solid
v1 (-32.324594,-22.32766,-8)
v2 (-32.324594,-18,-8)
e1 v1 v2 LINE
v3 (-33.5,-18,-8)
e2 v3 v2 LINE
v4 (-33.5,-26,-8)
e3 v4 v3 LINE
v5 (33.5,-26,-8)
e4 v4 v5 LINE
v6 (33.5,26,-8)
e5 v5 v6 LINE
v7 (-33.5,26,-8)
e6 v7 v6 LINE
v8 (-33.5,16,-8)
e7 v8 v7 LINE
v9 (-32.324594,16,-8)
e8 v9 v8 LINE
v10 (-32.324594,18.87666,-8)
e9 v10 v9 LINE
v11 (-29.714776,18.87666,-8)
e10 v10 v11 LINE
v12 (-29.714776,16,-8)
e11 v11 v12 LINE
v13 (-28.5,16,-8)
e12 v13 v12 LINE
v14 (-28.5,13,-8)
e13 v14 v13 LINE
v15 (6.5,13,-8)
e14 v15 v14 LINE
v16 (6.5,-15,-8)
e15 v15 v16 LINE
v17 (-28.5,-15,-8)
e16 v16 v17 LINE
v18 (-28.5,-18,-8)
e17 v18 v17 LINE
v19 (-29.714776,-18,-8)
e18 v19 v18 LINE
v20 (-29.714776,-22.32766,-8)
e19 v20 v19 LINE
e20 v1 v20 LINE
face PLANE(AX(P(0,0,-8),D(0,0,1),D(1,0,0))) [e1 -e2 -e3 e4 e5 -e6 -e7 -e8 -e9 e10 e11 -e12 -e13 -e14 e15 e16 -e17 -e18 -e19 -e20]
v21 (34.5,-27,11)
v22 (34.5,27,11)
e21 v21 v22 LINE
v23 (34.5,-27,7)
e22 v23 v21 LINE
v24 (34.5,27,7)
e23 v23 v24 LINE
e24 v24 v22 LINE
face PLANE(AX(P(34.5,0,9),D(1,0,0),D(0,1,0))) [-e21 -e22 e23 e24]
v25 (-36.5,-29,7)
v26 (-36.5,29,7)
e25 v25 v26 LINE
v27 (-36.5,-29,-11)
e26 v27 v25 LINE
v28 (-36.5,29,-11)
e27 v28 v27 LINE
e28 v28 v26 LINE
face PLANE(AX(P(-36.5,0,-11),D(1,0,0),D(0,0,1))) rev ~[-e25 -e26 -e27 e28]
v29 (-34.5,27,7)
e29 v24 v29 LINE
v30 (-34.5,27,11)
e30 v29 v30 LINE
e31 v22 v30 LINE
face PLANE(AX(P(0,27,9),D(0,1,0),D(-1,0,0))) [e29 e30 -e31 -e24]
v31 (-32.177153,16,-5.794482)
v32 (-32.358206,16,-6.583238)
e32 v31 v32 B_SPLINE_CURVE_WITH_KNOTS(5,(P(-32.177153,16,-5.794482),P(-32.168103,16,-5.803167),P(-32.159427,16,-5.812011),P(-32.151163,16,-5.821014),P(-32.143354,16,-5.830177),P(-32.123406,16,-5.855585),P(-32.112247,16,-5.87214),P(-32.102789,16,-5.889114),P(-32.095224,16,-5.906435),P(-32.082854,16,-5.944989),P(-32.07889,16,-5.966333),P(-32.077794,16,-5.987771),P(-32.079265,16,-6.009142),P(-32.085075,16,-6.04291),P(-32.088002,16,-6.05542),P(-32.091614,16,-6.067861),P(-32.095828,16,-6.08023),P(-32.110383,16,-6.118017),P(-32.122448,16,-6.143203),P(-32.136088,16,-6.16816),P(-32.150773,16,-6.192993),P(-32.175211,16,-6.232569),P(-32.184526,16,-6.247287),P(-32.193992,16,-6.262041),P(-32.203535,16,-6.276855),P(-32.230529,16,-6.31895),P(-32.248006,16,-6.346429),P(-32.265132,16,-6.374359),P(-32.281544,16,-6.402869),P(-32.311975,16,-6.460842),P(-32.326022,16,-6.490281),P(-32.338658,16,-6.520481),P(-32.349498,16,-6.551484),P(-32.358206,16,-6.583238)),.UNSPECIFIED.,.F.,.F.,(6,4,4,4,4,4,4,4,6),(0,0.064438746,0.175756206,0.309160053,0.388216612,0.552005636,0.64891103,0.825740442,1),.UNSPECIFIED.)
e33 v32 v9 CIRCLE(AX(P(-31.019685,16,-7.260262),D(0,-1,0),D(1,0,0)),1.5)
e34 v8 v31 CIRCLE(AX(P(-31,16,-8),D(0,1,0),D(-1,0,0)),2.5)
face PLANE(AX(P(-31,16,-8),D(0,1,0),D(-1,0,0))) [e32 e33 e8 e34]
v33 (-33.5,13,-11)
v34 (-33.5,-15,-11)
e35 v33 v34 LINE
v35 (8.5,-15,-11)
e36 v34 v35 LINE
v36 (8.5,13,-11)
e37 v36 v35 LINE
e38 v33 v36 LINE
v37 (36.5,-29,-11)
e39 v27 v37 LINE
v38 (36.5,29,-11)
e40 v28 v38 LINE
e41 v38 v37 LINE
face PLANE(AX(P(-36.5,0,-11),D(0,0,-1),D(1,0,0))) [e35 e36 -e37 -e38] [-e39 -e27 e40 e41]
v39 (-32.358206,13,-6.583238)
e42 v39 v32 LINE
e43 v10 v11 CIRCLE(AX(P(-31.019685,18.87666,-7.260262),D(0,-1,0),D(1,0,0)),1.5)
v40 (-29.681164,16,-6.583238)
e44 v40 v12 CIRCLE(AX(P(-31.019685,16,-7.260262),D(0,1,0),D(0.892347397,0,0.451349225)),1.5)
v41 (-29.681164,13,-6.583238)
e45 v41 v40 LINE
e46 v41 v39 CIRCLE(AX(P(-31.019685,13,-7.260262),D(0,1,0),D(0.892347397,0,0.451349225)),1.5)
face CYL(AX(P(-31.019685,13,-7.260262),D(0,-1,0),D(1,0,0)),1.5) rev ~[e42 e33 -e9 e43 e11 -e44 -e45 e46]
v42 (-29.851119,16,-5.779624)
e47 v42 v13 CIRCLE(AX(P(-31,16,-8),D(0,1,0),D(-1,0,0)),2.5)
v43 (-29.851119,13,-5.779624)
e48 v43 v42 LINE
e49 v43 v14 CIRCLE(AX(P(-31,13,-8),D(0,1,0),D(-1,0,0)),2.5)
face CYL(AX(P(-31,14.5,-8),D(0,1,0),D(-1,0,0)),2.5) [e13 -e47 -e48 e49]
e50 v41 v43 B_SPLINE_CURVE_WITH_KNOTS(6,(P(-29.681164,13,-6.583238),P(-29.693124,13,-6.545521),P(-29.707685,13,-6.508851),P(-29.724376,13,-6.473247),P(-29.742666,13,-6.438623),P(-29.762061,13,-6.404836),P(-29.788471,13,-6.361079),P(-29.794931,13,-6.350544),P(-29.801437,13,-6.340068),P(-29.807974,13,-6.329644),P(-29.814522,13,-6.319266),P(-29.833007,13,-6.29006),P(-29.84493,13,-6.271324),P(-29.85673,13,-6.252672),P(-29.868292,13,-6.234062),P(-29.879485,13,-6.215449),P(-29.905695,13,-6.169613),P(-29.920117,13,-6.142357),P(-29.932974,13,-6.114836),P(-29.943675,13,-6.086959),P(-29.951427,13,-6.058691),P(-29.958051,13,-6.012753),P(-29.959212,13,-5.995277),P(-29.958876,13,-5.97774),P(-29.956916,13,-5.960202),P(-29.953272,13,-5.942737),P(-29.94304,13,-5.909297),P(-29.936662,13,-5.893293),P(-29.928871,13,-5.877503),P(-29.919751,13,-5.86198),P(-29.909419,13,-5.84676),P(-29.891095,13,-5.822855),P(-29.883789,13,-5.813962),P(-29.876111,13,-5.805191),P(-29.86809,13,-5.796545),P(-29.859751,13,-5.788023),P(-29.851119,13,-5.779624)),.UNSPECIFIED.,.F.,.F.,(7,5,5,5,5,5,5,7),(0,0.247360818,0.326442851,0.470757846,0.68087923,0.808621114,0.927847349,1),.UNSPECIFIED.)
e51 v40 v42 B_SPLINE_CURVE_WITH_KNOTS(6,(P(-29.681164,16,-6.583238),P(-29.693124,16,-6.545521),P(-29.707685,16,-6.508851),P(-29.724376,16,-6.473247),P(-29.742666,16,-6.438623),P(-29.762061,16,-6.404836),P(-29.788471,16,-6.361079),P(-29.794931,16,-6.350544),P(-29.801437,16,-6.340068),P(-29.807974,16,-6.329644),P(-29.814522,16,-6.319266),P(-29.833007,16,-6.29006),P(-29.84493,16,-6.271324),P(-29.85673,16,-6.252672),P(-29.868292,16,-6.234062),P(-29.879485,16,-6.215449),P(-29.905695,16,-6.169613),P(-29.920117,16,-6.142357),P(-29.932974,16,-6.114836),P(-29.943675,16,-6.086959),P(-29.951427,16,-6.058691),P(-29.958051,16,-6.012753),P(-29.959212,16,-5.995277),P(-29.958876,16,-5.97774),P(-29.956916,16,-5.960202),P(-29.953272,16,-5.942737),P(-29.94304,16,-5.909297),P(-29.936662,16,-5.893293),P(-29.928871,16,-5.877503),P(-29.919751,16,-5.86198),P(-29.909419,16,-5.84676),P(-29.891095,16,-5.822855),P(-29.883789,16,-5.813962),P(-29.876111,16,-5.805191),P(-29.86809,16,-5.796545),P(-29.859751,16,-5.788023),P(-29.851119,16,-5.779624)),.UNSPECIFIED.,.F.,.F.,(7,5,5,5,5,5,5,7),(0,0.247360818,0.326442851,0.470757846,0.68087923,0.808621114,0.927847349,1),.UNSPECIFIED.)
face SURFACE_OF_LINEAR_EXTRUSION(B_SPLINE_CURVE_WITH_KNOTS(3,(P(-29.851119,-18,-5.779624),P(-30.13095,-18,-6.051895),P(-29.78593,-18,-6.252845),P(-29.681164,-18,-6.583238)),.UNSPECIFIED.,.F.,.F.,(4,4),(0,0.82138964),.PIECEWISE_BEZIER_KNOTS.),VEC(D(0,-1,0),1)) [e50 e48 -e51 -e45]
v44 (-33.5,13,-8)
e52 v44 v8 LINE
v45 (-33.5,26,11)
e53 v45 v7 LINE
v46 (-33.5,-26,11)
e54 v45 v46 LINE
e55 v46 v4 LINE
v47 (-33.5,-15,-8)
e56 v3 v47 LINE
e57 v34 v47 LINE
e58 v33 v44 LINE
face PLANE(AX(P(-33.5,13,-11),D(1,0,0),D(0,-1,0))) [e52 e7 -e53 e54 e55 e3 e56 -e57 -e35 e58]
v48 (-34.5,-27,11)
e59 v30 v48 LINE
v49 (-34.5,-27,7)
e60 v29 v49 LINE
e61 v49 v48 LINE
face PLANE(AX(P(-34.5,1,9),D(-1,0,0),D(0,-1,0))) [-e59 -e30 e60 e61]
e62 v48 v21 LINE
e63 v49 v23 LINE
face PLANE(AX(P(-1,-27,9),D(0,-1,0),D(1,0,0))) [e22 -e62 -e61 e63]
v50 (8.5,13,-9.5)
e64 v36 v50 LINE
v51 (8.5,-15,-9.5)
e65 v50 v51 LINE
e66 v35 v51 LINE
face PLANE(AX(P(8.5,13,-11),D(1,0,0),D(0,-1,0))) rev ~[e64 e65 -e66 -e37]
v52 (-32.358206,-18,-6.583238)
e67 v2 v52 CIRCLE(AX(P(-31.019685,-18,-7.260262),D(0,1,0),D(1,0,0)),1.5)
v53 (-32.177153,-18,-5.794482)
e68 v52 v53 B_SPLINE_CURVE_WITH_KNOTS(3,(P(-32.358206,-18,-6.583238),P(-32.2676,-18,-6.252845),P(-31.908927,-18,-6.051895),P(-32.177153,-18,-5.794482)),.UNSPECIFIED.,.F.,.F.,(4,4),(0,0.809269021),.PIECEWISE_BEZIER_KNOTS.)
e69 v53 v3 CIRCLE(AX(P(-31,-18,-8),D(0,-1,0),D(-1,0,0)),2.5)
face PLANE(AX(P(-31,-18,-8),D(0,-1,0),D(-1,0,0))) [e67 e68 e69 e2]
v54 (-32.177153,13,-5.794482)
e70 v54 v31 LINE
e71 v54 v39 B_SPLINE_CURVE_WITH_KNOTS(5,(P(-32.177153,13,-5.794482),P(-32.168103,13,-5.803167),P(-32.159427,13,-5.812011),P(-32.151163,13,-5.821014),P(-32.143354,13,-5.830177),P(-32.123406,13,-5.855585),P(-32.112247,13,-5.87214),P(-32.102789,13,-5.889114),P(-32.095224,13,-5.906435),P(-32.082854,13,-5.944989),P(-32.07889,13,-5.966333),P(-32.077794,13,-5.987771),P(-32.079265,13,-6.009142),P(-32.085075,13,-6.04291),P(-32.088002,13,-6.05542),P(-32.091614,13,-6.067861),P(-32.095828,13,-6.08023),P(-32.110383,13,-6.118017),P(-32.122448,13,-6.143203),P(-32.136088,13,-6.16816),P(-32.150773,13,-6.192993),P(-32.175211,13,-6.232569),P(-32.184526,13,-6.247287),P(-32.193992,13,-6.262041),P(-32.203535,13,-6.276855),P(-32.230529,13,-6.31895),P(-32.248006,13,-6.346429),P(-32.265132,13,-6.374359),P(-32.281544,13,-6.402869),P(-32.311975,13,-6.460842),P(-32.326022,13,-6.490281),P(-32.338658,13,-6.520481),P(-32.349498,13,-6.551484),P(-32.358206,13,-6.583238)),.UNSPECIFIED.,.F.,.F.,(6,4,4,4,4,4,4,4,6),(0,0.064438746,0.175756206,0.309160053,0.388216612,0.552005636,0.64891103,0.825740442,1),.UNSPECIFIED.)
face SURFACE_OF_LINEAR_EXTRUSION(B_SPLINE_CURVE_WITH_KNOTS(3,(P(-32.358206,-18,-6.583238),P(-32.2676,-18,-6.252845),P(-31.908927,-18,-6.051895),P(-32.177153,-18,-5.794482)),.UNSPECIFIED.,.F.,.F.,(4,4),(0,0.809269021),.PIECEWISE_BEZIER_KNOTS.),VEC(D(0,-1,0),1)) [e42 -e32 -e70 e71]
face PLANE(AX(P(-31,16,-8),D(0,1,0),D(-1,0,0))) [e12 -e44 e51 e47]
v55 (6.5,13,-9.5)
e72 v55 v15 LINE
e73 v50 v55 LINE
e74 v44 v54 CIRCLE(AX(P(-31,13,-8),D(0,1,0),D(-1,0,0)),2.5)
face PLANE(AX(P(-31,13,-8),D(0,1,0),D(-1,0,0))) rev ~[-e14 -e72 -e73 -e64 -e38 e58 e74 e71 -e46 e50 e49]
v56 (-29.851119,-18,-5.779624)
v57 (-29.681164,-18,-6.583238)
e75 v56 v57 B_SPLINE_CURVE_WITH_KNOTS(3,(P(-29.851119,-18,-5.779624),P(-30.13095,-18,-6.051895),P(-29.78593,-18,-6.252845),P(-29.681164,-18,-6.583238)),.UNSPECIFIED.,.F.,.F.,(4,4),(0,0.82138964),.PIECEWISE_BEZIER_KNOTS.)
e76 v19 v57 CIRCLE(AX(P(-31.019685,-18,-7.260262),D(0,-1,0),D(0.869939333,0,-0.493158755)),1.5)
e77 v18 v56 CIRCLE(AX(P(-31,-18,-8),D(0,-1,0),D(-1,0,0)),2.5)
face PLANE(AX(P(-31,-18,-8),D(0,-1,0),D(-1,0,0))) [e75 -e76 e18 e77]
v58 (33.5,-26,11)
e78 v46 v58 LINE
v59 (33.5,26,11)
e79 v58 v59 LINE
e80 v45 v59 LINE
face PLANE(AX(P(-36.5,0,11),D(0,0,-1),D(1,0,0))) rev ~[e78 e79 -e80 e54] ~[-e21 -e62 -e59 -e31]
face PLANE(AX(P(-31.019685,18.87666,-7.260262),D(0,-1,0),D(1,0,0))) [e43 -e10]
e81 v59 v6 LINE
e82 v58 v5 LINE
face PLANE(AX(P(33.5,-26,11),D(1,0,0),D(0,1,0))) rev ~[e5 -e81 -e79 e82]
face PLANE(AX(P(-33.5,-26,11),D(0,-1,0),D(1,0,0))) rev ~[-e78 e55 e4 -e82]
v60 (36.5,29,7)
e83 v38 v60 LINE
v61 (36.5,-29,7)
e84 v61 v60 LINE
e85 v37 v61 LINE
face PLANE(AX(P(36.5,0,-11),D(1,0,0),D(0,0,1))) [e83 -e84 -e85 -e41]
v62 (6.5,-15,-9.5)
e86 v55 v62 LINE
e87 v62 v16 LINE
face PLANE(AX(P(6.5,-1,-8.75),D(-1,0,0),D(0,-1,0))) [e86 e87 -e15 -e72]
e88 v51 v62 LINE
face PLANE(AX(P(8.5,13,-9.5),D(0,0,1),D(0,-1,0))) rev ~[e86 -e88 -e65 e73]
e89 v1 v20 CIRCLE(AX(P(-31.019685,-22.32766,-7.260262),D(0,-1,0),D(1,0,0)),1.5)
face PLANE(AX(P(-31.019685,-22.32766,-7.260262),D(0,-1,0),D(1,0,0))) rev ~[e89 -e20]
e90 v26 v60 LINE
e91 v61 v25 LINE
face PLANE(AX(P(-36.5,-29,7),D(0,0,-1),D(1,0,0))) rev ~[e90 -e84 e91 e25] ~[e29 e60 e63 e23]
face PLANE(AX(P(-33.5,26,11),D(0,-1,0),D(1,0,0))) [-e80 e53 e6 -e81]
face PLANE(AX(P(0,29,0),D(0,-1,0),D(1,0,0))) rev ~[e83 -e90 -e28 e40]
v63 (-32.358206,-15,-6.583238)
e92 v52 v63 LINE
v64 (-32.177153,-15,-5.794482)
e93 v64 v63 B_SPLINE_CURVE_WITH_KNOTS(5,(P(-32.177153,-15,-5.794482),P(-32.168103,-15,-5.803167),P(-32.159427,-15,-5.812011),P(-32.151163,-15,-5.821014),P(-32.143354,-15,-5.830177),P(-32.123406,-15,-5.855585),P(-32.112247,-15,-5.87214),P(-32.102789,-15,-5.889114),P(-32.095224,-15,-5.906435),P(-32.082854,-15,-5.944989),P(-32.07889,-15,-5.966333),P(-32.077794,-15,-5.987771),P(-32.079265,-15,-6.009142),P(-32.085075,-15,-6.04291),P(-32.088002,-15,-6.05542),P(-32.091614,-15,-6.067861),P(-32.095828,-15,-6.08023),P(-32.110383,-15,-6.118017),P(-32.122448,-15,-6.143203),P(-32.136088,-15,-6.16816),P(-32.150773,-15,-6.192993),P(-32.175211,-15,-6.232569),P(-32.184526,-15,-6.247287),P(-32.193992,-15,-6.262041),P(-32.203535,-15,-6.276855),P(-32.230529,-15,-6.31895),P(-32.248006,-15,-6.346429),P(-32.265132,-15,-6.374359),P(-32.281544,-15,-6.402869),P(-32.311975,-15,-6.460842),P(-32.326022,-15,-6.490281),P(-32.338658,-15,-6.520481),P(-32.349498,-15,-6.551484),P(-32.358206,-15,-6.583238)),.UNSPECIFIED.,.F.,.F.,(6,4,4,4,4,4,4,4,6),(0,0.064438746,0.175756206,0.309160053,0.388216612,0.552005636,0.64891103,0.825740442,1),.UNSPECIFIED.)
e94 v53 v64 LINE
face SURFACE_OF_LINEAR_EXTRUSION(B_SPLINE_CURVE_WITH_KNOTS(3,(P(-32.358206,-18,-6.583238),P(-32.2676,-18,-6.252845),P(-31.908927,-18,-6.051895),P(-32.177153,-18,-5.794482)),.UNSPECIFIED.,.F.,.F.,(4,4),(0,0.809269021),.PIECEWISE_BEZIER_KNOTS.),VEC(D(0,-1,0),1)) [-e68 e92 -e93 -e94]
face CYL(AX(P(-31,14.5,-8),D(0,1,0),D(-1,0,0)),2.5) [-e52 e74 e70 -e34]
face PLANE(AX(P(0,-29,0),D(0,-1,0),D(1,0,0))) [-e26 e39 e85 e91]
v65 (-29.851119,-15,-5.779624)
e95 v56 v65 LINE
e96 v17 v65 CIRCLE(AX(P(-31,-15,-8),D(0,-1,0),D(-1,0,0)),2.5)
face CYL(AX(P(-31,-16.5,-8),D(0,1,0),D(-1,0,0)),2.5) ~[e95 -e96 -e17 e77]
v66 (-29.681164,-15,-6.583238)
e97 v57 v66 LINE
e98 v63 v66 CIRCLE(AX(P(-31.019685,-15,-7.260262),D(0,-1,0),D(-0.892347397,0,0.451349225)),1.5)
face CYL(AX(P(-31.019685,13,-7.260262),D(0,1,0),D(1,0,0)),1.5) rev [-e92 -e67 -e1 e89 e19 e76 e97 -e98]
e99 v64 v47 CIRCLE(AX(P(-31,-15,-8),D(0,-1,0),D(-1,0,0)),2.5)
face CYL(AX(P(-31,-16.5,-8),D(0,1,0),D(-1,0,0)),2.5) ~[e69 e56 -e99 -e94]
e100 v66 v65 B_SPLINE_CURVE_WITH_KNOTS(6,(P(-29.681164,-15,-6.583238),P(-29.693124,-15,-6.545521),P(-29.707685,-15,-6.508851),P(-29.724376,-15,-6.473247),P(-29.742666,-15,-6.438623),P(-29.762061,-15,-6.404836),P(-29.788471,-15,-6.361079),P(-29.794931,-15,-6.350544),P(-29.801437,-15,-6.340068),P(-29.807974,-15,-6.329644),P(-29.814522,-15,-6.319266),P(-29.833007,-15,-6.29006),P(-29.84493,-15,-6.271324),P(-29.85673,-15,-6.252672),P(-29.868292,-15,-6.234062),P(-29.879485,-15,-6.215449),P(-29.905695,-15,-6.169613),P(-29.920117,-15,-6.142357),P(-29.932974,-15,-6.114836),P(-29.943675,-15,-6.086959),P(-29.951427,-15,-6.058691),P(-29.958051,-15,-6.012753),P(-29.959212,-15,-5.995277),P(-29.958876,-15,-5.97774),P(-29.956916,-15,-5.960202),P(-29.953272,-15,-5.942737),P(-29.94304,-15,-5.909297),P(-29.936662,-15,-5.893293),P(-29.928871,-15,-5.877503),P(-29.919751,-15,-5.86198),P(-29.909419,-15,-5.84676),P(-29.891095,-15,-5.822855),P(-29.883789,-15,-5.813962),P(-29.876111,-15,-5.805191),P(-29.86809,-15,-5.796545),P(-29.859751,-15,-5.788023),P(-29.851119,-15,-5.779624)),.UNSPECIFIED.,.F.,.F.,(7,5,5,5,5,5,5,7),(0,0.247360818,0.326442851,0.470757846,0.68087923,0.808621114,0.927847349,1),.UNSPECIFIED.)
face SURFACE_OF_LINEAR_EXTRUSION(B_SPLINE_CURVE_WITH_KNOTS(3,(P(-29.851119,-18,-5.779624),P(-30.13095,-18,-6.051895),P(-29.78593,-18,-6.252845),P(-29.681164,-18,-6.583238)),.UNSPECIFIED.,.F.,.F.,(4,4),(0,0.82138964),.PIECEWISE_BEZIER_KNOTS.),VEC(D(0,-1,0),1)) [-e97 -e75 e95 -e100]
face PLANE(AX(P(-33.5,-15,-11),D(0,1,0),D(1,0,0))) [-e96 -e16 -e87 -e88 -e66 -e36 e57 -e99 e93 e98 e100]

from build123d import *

# Parameters (mm, degrees)
F0_W      = 73
F0_H      = 22
F1_DEPTH  = 29
F2_W      = 67
F2_H      = 52
F3_DEPTH  = 19
F4_W      = 58
F4_H      = 4
F5_DEPTH  = 2
F6_W      = 71
F6_H      = 4
F7_DEPTH  = 2
F8_W      = 56
F8_H      = 4
F9_DEPTH  = 2
F10_W     = 69
F10_H     = 4
F11_DEPTH = 2
F12_W     = 42
F12_H     = 28
F13_DEPTH = 22.001
F14_W     = 2.5
F14_H     = 3
F16_W     = 2.5
F16_H     = 3
F18_R     = 1.5
F19_DEPTH = 35.32766
F20_DEPTH = 5.87666
F22_DEPTH = 38.628
F23_W     = 28
F23_H     = 1.5
F24_DEPTH = 2


with BuildPart() as f1:
    # F0 (on Front) → F1 (new body, symmetric)
    with BuildSketch(Plane.XZ):
        Rectangle(F0_W, F0_H)
    extrude(amount=F1_DEPTH, both=True)

    # F2 (on face) → F3 (cut)
    with BuildSketch(Plane.XY.offset(11)):
        Rectangle(F2_W, F2_H)
    extrude(amount=-F3_DEPTH, mode=Mode.SUBTRACT)

    # F4 (on face) → F5 (cut)
    with BuildSketch(Plane.YZ.offset(36.5)):
        with Locations((0, 9)):
            Rectangle(F4_W, F4_H)
    extrude(amount=-F5_DEPTH, mode=Mode.SUBTRACT)

    # F6 (on face) → F7 (cut)
    with BuildSketch(Plane.XZ.offset(29)):
        with Locations((-1, 9)):
            Rectangle(F6_W, F6_H)
    extrude(amount=-F7_DEPTH, mode=Mode.SUBTRACT)

    # F8 (on face) → F9 (cut)
    with BuildSketch(Plane(origin=(-36.5, 0, 0), x_dir=(0, -1, 0), z_dir=(-1, 0, 0))):
        with Locations((-1, 9)):
            Rectangle(F8_W, F8_H)
    extrude(amount=-F9_DEPTH, mode=Mode.SUBTRACT)

    # F10 (on face) → F11 (cut)
    with BuildSketch(Plane(origin=(0, 29, 0), x_dir=(-1, 0, 0), z_dir=(0, 1, 0))):
        with Locations((0, 9)):
            Rectangle(F10_W, F10_H)
    extrude(amount=-F11_DEPTH, mode=Mode.SUBTRACT)

    # F12 (on face) → F13 (cut, through all)
    with BuildSketch(Plane(origin=(0, 0, -11), x_dir=(1, 0, 0), z_dir=(0, 0, -1))):
        with Locations((-12.5, 1)):
            Rectangle(F12_W, F12_H)
    extrude(amount=-F13_DEPTH, mode=Mode.SUBTRACT)

    # F14 (on face) → F15 (revolve)
    with BuildSketch(Plane.XY.offset(-8)):
        with Locations((-32.25, -16.5)):
            Rectangle(F14_W, F14_H)
    revolve(axis=Axis((-31, -16.5, -8), (0, -1, 0)))

    # F16 (on face) → F17 (revolve)
    with BuildSketch(Plane.XY.offset(-8)):
        with Locations((-32.25, 14.5)):
            Rectangle(F16_W, F16_H)
    revolve(axis=Axis((-31, 14.5, -8), (0, 1, 0)))

    # F18 (on face) → F19 (cut)
    with BuildSketch(Plane.XZ.offset(-13)):
        with Locations((-31.0196849202, -7.260261868)):
            Circle(F18_R)
    extrude(amount=F19_DEPTH, mode=Mode.SUBTRACT)

    # F18 (on face) → F20 (cut)
    with BuildSketch(Plane.XZ.offset(-13)):
        with Locations((-31.0196849202, -7.260261868)):
            Circle(F18_R)
    extrude(amount=-F20_DEPTH, mode=Mode.SUBTRACT)

    # F21 (on face) → F22 (cut)
    with BuildSketch(Plane.XZ.offset(18)):
        with BuildLine():
            add(Edge.make_bspline(
                [(-32.3582060158, -6.5832380305), (-32.2676000125, -6.2528454981), (-31.9089266521, -6.0518947977), (-32.1771532814, -5.7944818858)],
                knots=[0, 0, 0, 0, 0.8092690211, 0.8092690211, 0.8092690211, 0.8092690211], degree=3))
            ThreePointArc((-32.3582060158, -6.5832380305), (-31.0196849202, -5.760261868), (-29.6811638245, -6.5832380305))
            add(Edge.make_bspline(
                [(-29.8511186855, -5.7796235172), (-30.1309504135, -6.0518947977), (-29.7859304255, -6.2528454981), (-29.6811638245, -6.5832380305)],
                knots=[0, 0, 0, 0, 0.82138964, 0.82138964, 0.82138964, 0.82138964], degree=3))
            ThreePointArc((-29.8511186855, -5.7796235172), (-31.0159693083, -5.5000510043), (-32.1771532814, -5.7944818858))
        make_face()
    extrude(amount=-F22_DEPTH, mode=Mode.SUBTRACT)

    # F23 (on face) → F24 (join)
    with BuildSketch(Plane(origin=(8.5, 0, 0), x_dir=(0, -1, 0), z_dir=(-1, 0, 0))):
        with Locations((1, -8.75)):
            Rectangle(F23_W, F23_H)
    extrude(amount=F24_DEPTH)


solid = f1.part
